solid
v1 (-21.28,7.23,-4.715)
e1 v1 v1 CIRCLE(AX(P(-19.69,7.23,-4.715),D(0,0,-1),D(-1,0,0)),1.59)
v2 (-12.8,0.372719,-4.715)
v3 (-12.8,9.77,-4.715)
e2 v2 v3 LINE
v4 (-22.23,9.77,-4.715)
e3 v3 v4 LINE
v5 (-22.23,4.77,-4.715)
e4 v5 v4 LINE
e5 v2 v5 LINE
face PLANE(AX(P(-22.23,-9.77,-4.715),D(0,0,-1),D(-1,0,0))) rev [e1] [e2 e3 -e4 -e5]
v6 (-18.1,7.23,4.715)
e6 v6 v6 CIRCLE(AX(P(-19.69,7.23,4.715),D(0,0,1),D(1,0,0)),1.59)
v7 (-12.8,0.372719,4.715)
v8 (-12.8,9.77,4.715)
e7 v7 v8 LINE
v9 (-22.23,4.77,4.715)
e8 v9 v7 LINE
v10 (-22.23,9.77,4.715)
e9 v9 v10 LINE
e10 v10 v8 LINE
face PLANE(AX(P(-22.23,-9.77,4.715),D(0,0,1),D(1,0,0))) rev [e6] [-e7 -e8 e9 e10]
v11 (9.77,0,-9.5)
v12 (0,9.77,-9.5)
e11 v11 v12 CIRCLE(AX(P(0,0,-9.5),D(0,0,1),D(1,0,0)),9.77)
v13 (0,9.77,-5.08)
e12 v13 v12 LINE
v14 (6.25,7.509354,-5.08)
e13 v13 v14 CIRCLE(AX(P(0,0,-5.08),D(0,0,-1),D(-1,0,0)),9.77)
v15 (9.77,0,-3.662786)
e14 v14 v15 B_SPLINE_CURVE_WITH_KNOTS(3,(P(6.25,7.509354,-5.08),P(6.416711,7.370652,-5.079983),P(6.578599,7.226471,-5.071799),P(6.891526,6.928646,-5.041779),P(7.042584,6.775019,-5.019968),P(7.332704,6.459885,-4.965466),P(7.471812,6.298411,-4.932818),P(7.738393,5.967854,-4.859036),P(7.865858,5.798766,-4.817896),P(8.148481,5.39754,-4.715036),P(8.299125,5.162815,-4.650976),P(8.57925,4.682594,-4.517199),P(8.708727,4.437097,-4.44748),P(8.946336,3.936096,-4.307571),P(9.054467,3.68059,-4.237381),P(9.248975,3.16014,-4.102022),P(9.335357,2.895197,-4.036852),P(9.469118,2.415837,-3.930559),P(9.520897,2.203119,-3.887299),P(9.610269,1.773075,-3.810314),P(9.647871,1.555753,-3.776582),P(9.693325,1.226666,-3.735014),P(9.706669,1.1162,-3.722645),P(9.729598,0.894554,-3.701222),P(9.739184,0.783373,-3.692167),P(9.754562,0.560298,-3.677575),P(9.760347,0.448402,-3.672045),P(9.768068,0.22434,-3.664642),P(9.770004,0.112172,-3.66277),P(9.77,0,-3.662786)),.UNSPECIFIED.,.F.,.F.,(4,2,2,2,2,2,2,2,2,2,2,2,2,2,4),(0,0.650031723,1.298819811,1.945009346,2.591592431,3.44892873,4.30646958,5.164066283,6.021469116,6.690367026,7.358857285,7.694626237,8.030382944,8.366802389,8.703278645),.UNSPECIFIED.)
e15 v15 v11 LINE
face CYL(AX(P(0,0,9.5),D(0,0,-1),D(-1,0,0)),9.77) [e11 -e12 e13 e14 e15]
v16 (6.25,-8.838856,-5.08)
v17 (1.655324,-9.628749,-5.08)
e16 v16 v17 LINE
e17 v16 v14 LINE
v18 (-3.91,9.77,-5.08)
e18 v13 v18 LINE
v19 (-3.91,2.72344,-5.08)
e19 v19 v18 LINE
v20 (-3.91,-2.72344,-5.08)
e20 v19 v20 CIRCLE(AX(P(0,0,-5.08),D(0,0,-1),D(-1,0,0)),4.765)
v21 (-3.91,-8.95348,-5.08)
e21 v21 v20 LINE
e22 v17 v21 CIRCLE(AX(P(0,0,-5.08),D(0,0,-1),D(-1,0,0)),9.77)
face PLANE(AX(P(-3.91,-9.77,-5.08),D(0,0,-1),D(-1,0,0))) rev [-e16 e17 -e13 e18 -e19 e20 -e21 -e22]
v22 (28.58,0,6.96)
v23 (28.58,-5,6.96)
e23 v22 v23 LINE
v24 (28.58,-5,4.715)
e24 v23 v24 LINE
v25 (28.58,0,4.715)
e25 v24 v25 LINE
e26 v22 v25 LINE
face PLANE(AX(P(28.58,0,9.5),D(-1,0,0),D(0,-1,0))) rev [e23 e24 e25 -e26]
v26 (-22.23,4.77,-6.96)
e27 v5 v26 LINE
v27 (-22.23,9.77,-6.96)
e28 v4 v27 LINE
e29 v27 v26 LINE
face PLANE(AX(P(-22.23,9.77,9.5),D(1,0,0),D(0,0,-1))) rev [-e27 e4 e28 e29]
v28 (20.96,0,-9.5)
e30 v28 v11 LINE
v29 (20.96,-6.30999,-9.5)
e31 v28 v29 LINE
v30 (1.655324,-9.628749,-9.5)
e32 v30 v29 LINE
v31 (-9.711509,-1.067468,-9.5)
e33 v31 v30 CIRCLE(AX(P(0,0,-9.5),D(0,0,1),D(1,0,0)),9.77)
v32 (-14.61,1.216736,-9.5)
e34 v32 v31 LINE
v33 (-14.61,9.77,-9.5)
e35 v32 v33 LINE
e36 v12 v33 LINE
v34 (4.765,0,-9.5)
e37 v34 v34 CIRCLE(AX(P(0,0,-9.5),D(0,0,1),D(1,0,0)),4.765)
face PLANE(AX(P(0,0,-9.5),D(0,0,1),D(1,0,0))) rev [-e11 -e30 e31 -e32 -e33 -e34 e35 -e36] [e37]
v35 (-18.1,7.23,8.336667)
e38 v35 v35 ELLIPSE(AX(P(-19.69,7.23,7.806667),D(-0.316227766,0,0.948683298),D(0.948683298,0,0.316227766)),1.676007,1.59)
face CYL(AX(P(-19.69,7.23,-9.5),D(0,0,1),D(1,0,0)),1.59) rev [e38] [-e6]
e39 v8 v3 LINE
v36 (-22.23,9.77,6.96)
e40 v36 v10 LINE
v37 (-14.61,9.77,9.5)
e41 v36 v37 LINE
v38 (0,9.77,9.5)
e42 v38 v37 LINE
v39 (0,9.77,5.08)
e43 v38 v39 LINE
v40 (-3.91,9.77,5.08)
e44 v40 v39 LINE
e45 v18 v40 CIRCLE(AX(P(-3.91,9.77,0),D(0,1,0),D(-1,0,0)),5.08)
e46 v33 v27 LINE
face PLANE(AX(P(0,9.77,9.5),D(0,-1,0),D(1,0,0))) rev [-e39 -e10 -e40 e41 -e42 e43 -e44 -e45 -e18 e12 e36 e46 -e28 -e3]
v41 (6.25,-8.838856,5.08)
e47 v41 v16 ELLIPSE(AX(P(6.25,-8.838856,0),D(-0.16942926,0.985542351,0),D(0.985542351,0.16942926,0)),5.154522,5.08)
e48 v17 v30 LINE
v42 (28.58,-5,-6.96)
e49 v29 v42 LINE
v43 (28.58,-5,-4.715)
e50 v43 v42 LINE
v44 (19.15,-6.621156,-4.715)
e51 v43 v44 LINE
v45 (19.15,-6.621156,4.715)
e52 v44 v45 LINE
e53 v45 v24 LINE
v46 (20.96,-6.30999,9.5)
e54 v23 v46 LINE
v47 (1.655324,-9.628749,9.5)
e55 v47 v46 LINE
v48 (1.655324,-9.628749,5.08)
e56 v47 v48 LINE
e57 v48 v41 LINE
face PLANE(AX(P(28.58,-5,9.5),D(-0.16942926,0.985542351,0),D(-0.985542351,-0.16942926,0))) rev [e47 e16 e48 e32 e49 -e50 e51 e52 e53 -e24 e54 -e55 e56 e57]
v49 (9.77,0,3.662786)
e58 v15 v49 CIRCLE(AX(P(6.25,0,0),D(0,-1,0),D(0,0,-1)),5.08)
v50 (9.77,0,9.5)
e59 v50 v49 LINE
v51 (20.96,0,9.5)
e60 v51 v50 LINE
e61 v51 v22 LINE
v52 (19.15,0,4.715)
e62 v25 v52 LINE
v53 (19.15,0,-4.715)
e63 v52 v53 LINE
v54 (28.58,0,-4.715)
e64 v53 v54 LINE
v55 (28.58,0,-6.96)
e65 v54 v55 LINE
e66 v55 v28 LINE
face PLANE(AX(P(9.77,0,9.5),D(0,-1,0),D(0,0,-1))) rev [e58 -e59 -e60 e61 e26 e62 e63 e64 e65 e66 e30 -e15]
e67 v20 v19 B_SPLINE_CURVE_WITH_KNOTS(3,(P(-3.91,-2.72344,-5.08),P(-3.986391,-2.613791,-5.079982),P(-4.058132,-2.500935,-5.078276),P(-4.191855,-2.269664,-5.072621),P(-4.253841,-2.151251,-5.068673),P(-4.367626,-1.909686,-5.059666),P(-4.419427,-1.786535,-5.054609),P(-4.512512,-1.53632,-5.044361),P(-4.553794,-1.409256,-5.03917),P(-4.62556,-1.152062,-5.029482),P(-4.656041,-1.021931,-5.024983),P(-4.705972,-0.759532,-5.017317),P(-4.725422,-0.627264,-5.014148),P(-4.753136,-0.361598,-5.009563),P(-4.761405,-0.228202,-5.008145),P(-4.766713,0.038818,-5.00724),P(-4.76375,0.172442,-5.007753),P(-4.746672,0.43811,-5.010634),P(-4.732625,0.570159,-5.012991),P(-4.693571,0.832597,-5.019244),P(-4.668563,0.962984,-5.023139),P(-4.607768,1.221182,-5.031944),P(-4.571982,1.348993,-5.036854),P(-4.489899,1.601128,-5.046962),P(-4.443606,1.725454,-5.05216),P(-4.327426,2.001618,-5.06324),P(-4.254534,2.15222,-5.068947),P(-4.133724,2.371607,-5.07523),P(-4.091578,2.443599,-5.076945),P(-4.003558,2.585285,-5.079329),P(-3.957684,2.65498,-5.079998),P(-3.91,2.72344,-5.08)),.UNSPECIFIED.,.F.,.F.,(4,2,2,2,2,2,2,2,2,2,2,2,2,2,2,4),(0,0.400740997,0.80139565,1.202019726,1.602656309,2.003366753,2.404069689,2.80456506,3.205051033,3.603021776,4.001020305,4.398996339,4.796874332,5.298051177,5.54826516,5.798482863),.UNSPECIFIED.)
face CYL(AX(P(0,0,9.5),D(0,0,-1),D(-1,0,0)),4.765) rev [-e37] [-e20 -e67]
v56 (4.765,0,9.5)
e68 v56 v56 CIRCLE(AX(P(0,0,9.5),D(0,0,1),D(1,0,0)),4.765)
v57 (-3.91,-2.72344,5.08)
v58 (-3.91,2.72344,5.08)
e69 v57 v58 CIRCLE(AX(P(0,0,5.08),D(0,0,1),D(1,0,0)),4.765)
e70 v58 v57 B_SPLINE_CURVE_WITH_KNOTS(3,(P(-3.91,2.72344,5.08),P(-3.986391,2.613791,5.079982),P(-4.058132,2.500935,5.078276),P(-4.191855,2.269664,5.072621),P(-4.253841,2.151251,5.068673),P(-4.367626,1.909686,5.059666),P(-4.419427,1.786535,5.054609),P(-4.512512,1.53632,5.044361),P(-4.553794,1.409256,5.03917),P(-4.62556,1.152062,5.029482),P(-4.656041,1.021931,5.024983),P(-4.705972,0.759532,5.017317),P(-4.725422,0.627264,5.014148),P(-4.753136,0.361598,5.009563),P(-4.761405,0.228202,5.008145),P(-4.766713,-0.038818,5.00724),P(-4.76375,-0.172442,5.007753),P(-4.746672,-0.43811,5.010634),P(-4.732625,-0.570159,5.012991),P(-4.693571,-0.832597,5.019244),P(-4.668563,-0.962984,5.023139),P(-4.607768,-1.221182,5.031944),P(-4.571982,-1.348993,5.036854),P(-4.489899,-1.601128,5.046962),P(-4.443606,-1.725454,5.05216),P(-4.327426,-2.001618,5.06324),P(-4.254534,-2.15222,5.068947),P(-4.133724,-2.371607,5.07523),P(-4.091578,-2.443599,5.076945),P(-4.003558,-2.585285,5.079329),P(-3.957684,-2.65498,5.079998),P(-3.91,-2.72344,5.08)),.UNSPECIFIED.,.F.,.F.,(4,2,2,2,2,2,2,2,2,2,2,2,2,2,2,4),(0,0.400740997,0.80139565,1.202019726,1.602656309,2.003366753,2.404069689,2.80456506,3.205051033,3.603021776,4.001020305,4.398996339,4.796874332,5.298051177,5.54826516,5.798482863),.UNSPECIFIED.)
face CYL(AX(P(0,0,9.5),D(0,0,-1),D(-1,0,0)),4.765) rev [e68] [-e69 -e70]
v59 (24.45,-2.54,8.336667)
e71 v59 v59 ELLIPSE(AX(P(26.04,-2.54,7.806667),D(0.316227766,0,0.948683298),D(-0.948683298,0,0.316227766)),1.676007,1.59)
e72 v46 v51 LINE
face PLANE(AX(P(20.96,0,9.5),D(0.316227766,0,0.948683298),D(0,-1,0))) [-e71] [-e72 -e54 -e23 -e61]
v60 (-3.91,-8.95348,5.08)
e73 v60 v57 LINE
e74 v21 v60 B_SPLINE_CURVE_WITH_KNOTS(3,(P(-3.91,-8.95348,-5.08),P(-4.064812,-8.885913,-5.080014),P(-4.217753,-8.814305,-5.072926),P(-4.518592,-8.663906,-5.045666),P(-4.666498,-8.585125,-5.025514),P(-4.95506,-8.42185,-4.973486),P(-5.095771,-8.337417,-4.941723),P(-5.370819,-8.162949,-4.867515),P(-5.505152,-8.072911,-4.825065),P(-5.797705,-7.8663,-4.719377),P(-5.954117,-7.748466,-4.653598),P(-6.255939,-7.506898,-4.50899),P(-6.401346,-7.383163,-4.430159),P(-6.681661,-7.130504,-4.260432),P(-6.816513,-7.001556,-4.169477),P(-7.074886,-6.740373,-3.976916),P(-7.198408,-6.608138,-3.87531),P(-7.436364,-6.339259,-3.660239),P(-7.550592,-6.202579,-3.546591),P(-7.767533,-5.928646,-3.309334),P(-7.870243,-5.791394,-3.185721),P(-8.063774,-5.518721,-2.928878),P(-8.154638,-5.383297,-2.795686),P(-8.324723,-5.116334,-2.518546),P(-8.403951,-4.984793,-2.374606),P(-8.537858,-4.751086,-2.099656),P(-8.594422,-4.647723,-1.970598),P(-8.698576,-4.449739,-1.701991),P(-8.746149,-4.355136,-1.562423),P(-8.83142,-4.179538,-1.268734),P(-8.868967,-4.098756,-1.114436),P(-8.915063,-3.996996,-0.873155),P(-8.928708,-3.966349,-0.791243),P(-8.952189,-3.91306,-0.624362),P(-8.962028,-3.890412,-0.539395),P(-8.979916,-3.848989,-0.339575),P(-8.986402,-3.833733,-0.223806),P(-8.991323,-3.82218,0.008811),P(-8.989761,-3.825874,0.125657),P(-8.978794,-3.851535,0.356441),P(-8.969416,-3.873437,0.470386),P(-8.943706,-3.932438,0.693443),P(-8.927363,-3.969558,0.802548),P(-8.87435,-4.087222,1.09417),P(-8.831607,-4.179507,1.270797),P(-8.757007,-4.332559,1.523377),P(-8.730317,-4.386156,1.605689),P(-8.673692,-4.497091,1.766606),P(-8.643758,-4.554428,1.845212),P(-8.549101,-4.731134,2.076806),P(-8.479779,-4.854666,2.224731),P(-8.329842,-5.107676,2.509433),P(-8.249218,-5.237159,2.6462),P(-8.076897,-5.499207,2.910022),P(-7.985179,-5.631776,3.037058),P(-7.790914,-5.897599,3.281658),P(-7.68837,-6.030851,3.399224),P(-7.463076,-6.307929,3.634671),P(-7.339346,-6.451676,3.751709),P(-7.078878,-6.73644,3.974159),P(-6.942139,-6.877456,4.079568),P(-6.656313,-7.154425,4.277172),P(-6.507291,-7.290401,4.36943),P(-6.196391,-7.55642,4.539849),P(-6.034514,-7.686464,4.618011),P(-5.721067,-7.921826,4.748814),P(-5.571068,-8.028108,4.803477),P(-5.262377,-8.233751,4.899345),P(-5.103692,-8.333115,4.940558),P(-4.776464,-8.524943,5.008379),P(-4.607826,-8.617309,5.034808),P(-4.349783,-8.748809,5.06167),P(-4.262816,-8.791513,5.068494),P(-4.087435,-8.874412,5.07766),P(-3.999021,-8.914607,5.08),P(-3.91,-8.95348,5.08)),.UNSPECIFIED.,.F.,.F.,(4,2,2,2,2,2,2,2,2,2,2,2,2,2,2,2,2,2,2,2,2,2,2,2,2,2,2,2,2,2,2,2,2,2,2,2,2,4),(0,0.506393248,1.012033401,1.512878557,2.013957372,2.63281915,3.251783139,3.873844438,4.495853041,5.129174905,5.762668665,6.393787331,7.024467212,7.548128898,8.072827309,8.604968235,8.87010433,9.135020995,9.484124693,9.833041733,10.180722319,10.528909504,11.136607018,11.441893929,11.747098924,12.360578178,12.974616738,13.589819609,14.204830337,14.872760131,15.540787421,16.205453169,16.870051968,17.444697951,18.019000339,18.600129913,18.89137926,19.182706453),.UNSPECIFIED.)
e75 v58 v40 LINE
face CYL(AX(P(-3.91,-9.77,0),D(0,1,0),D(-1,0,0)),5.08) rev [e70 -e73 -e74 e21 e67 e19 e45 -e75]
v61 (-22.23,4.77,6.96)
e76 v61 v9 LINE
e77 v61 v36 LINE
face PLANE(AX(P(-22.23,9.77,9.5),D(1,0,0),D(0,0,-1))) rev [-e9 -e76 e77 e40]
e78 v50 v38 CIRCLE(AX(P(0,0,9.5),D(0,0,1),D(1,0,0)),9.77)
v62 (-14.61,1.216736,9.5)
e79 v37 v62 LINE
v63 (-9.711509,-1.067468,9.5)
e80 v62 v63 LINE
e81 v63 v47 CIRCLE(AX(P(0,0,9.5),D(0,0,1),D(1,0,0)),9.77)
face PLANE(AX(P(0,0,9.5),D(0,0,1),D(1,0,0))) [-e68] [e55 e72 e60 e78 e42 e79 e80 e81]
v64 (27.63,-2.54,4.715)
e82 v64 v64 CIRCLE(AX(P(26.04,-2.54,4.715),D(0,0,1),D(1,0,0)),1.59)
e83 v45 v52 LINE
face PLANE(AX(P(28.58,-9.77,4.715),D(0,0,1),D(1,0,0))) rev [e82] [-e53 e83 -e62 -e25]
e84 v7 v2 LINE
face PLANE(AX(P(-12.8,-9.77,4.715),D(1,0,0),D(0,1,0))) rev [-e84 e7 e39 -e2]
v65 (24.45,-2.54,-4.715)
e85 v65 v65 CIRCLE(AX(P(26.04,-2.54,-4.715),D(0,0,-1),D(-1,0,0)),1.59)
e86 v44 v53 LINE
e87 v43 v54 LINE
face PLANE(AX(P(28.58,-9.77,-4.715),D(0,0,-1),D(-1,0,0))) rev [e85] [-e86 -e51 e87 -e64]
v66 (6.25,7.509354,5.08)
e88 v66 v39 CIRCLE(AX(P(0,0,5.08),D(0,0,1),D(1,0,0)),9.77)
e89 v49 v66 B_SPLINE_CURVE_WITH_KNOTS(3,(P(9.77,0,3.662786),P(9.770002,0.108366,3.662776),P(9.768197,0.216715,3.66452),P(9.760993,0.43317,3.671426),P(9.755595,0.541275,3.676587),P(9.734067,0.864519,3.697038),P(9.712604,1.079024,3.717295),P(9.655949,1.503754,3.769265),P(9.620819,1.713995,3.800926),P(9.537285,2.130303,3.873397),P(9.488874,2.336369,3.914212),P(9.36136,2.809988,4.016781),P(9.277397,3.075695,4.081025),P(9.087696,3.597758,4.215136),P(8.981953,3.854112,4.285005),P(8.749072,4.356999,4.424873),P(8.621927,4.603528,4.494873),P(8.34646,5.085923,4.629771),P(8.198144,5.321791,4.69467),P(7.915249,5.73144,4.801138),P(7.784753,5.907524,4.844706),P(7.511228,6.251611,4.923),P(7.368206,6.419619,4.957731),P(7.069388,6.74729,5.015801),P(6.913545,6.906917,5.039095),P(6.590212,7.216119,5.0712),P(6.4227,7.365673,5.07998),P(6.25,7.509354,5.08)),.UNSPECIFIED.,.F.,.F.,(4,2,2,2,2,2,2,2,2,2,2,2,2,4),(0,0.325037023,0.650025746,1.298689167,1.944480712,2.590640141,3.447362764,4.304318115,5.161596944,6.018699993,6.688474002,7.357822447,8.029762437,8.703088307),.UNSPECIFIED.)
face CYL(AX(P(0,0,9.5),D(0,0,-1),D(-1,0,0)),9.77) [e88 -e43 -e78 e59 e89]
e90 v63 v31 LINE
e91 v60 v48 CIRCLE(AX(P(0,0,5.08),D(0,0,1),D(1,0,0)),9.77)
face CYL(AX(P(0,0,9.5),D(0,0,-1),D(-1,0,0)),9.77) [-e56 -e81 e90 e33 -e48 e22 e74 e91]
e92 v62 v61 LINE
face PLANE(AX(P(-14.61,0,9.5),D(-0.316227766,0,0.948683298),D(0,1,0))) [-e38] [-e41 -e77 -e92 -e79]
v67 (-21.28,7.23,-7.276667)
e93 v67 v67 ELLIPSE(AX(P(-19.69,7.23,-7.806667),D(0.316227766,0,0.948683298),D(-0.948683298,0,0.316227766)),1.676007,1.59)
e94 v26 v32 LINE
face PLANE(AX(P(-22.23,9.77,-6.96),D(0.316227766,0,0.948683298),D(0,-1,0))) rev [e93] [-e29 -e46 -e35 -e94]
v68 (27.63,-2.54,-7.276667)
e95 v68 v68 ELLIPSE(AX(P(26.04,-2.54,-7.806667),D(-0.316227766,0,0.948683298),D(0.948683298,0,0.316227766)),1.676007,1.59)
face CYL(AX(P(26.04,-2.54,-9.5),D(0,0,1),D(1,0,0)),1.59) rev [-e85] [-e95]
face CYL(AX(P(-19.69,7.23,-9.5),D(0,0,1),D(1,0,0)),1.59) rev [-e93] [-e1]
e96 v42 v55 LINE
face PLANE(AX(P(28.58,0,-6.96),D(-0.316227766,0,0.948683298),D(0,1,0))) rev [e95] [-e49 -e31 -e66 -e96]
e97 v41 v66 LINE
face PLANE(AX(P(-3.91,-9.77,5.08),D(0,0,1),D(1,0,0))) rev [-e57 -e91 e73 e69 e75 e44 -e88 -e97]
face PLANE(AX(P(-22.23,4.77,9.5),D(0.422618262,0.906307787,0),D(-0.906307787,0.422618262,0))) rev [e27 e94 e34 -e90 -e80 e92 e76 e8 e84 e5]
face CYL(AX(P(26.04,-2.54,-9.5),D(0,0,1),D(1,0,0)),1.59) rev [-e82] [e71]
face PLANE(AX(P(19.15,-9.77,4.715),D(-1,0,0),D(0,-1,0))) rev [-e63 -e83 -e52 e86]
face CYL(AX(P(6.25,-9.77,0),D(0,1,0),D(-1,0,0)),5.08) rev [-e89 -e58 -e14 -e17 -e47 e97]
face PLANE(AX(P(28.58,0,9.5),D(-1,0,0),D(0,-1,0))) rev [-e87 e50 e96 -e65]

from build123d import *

# Parameters (mm, degrees)
SKETCH1_R           = 4.765
BOSS_EXTRUDE1_DEPTH = 9.5
SKETCH3_W           = 9.43
SKETCH3_H           = 9.43
CUT_EXTRUDE1_DEPTH  = 36.900947063
CUT_EXTRUDE2_DEPTH  = 36.900947063
SKETCH5_R           = 1.59
CUT_EXTRUDE3_DEPTH  = 36.682899346
CHAMFER1_SIZE       = 2.54
CHAMFER1_SIZE_2     = 7.62
CHAMFER2_SIZE       = 7.62
CHAMFER2_SIZE_2     = 2.54


with BuildPart() as part:
    # Sketch1 → Boss-Extrude1 (new, symmetric)
    with BuildSketch(Plane.XY):
        with BuildLine():
            Line((0, 9.77), (-22.23, 9.77))
            Line((-22.23, 9.77), (-22.23, 4.77))
            Line((-22.23, 4.77), (-9.711509246, -1.067468107))
            ThreePointArc((-9.711509246, -1.067468107), (-5.877874817, -7.804068659), (1.655323868, -9.628748771))
            Line((1.655323868, -9.628748771), (28.58, -5))
            Line((28.58, -5), (28.58, 0))
            Line((28.58, 0), (9.77, 0))
            ThreePointArc((9.77, 0), (6.908433252, 6.908433252), (0, 9.77))
        make_face()
        Circle(SKETCH1_R, mode=Mode.SUBTRACT)
    extrude(amount=BOSS_EXTRUDE1_DEPTH, both=True)

    # Sketch3 → Cut-Extrude1 (cut, through all)
    with BuildSketch(Plane(origin=(0, 9.77, 0), x_dir=(1, 0, 0), z_dir=(0, 1, 0))):
        with Locations((-17.515, 0)):
            Rectangle(SKETCH3_W, SKETCH3_H)
        with Locations((23.865, 0)):
            Rectangle(SKETCH3_W, SKETCH3_H)
    extrude(amount=-CUT_EXTRUDE1_DEPTH, mode=Mode.SUBTRACT)

    # Sketch4 → Cut-Extrude2 (cut, through all)
    with BuildSketch(Plane(origin=(0, 9.77, 0), x_dir=(1, 0, 0), z_dir=(0, 1, 0))):
        with BuildLine():
            Line((-3.91, 5.08), (6.25, 5.08))
            ThreePointArc((6.25, 5.08), (11.33, 0), (6.25, -5.08))
            Line((6.25, -5.08), (-3.91, -5.08))
            ThreePointArc((-3.91, -5.08), (-8.99, 0), (-3.91, 5.08))
        make_face()
    extrude(amount=-CUT_EXTRUDE2_DEPTH, mode=Mode.SUBTRACT)

    # Sketch5 → Cut-Extrude3 (cut, through all)
    with BuildSketch(Plane.XY.offset(9.5)):
        with Locations((-19.69, 7.23)):
            Circle(SKETCH5_R)
        with Locations((26.04, -2.54)):
            Circle(SKETCH5_R)
    extrude(amount=-CUT_EXTRUDE3_DEPTH, mode=Mode.SUBTRACT)

    # Chamfer1
    # the kernel refuses this chamfer: 7.62, 2.54 mm, written as the material it takes off along each edge
    with BuildSketch(Plane(origin=(-22.23, 29.544364901, -9.5), x_dir=(-0.1090261201798072, 0, 0.9940388851139267), z_dir=(0, -1, 0))) as chamfer1_piece_1:
        Polygon((CHAMFER1_SIZE * 0.994038885114, -CHAMFER1_SIZE * 0.10902612018), (-CHAMFER1_SIZE_2 * 0.10902612018, -CHAMFER1_SIZE_2 * 0.994038885114), (0, 0), align=None)
    extrude(amount=44.548729802, mode=Mode.SUBTRACT)
    with BuildSketch(Plane(origin=(28.58, -24.774364901, -9.5), x_dir=(-0.9999257509361695, 0, -0.012185754582199181), z_dir=(0, 1, 0))) as chamfer1_piece_2:
        Polygon((CHAMFER1_SIZE_2 * 0.999925750936, CHAMFER1_SIZE_2 * 0.0121857545822), (-CHAMFER1_SIZE * 0.0121857545822, CHAMFER1_SIZE * 0.999925750936), (0, 0), align=None)
    extrude(amount=44.548729802, mode=Mode.SUBTRACT)

    # Chamfer2
    # the kernel refuses this chamfer: 7.62, 2.54 mm, written as the material it takes off along each edge
    with BuildSketch(Plane(origin=(-22.23, 29.544364901, 9.5), x_dir=(0.9999257509361695, 0, 0.012185754582199181), z_dir=(0, -1, 0)), Plane(origin=(28.58, -24.774364901, 9.5), x_dir=(-0.9999257509361695, 0, 0.012185754582199181), z_dir=(0, 1, 0))) as chamfer2_piece_1:
        Polygon((CHAMFER2_SIZE * 0.999925750936, -CHAMFER2_SIZE * 0.0121857545822), (-CHAMFER2_SIZE_2 * 0.0121857545822, -CHAMFER2_SIZE_2 * 0.999925750936), (0, 0), align=None)
    extrude(amount=44.548729802, mode=Mode.SUBTRACT)


solid = part.part
